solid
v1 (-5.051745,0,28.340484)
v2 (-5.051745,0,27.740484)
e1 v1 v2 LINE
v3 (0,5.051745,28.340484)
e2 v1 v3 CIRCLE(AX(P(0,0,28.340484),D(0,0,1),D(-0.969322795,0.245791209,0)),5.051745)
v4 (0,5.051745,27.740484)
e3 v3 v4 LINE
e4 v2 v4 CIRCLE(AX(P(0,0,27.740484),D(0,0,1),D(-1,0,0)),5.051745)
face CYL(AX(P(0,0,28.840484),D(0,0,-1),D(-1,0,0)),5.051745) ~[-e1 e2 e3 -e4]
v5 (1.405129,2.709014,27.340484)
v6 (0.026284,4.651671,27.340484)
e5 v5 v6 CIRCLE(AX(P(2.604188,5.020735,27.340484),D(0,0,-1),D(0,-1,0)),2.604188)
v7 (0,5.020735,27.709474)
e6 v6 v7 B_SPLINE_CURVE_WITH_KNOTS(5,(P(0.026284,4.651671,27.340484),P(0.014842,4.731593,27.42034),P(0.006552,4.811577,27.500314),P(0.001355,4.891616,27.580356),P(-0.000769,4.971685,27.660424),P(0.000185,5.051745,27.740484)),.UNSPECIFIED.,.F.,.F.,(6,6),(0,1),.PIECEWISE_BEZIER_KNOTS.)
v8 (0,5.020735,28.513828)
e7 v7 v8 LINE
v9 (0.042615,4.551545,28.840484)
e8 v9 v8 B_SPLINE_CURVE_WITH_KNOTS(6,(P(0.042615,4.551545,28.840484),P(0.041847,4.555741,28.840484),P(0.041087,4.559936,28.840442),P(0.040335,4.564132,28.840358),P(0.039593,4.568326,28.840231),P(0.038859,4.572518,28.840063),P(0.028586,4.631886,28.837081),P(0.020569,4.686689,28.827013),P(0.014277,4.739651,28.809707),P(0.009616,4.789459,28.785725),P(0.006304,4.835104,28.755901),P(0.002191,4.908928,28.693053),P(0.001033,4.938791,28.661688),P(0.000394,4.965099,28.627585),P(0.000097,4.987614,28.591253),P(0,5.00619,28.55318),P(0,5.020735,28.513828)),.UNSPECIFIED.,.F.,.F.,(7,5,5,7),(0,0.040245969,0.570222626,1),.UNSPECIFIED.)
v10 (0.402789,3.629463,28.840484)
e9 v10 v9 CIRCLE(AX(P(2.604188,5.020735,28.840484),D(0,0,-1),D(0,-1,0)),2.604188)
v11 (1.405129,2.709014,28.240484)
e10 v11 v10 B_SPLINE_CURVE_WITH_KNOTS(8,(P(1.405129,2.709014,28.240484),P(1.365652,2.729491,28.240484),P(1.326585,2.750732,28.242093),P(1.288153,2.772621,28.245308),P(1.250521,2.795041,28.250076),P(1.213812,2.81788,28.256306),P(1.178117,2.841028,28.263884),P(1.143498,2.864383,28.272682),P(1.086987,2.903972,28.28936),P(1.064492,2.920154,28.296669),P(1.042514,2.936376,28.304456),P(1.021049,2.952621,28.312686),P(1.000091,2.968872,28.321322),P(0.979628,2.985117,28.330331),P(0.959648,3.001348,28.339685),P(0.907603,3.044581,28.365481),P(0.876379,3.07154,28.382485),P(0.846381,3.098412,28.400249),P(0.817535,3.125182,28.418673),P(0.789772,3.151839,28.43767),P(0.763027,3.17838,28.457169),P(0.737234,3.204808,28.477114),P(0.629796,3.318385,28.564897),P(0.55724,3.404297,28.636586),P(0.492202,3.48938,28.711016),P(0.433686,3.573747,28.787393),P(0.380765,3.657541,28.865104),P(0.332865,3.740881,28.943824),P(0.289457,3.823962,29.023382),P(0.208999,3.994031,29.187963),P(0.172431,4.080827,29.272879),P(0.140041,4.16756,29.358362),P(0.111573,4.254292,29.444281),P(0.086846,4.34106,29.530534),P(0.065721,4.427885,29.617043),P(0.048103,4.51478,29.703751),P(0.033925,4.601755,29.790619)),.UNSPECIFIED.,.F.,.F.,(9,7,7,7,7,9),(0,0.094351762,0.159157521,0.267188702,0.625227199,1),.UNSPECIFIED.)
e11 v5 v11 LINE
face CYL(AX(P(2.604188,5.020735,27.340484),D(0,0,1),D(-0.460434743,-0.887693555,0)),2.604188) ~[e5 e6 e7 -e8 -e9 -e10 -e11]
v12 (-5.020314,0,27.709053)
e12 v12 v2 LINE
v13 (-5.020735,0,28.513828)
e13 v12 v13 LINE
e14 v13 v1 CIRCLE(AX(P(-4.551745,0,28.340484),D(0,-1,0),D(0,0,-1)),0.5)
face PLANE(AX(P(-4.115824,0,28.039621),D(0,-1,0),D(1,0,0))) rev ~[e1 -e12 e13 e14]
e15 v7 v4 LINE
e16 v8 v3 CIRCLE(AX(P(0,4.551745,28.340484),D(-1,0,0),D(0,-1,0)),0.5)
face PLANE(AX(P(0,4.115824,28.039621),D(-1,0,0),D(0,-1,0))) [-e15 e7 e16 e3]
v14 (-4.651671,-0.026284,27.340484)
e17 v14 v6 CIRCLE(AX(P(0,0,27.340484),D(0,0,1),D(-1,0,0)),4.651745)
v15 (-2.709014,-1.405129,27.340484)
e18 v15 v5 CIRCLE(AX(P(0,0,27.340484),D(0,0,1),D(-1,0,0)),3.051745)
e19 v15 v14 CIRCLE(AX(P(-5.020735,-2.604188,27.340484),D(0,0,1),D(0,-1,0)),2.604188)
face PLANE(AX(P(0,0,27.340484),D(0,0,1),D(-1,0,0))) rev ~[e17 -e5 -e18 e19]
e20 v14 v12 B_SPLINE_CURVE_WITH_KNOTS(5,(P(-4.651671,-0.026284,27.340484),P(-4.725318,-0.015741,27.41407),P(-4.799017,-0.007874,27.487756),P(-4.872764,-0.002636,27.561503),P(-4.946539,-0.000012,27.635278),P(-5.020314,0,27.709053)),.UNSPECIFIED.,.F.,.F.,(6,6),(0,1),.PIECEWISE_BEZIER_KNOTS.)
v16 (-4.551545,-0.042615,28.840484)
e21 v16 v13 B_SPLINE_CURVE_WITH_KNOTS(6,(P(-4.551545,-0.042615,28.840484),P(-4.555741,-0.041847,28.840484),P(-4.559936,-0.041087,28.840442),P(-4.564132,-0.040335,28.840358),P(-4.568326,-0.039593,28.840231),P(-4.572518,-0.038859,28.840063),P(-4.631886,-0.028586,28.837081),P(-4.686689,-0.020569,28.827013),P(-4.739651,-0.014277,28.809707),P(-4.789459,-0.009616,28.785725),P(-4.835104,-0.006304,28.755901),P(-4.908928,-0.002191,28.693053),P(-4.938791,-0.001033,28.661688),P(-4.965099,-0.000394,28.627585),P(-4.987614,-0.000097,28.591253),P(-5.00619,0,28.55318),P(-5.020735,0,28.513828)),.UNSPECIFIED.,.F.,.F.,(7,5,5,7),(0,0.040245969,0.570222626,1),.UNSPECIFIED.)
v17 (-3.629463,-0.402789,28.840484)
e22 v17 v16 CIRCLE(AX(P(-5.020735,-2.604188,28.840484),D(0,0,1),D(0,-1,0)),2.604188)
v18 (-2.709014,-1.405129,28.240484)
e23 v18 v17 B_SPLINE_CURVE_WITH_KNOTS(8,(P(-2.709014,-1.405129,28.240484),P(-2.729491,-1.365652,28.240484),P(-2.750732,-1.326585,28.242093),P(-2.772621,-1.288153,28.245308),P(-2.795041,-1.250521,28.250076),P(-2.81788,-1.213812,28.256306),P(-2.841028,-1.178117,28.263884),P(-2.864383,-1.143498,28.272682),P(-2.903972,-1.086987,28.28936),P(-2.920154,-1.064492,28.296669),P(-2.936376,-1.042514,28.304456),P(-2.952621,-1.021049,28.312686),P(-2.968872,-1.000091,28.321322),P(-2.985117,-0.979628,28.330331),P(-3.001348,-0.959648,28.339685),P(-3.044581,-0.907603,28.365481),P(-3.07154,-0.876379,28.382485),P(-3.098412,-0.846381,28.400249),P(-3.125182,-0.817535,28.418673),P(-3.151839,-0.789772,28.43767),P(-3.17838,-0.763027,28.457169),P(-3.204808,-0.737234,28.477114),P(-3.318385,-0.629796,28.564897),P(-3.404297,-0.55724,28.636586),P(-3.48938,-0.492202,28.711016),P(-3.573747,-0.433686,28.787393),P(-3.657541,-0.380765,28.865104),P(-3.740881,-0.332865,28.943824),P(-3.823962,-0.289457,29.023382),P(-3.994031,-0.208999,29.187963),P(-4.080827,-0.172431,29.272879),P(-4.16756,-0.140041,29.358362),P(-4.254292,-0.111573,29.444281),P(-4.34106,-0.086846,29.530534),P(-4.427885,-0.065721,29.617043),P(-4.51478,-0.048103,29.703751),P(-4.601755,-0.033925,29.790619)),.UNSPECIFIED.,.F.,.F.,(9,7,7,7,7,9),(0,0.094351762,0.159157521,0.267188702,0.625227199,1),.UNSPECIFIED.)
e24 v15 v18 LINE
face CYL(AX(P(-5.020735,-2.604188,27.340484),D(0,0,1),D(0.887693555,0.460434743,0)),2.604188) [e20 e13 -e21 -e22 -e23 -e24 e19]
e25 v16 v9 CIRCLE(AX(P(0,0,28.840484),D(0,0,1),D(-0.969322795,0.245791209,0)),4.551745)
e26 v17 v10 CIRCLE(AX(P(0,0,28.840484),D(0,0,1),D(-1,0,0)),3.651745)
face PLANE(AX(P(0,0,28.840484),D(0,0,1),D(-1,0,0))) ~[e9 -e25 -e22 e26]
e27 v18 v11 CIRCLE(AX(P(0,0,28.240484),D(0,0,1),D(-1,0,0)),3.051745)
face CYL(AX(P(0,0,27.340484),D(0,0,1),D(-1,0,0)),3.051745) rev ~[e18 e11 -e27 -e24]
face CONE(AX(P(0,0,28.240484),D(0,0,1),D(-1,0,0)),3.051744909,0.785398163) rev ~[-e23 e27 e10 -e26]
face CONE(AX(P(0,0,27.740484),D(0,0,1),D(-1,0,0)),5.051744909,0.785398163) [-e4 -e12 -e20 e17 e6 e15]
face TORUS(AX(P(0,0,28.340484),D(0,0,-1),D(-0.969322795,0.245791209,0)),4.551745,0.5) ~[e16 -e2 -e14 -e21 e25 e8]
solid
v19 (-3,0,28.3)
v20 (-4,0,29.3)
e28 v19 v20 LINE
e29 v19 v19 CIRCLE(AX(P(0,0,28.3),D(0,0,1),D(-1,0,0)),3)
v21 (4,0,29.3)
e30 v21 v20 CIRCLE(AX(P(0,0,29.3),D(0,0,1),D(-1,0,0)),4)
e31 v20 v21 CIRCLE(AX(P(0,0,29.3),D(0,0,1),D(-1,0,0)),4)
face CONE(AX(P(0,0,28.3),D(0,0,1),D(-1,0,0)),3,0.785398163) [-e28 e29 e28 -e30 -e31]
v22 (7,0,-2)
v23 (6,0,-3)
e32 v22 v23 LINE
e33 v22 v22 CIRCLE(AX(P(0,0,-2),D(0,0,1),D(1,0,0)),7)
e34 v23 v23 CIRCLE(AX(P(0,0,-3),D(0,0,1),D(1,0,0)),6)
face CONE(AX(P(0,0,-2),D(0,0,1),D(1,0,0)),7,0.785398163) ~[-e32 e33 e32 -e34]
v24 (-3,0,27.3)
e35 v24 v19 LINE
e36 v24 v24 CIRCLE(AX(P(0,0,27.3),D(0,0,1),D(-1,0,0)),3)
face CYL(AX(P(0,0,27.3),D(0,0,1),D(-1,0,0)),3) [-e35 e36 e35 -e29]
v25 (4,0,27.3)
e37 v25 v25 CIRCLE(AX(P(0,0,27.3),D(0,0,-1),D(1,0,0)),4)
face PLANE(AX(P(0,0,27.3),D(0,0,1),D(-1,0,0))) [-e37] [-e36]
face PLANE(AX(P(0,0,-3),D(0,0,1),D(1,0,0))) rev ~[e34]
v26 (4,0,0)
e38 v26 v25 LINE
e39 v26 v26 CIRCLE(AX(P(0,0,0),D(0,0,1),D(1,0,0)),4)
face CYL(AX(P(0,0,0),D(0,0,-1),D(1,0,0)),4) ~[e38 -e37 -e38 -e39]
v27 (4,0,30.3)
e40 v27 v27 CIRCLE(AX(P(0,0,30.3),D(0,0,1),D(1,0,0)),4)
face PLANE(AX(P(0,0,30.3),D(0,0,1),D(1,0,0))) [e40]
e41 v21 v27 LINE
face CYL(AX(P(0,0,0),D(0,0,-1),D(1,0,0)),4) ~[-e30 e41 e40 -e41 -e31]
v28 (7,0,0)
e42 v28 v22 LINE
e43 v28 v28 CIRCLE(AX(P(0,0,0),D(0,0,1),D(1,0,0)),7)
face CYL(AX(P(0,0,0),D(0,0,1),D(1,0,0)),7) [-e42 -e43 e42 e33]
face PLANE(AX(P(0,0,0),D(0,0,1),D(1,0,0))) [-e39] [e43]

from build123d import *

# Parameters (mm, degrees)
F0_R         = 4
F1_DEPTH     = 30.3
F2_R         = 7
F3_DEPTH     = 3
F6_SIZE      = 1
F8_ANGLE     = 270
F9_R         = 2.6041880276
F10_T2_ANGLE = 298.457193056
F11_SIZE     = 0.4


# Not quite as in the source:
# - a fillet or chamfer that OpenCascade refuses, or shapes differently, is made with other operations: its cross-section is extruded or revolved along the edge and cut away or added


with BuildPart() as f1:
    # F0 (on Top) → F1 (new body)
    with BuildSketch(Plane.XY):
        Circle(F0_R)
    extrude(amount=F1_DEPTH)

    # F2 (on Top) → F3 (join)
    with BuildSketch(Plane.XY):
        Circle(F2_R)
    extrude(amount=-F3_DEPTH)

    # F4 (on Front) → F5 (revolve, cut)
    with BuildSketch(Plane.XZ):
        Polygon((-4, 29.3), (-4.1, 29.3), (-4.1, 27.3), (-3, 27.3), (-3, 28.3), align=None)
    revolve(axis=Axis((0, 0, 30.3), (0, 0, 1)), mode=Mode.SUBTRACT)

    # F6
    f6_edges = [f1.edges().sort_by_distance(p)[0] for p in [
        (-7, 0, -3),
    ]]
    chamfer(f6_edges, length=F6_SIZE)


with BuildPart() as f8:
    # F7 (on Front) → F8 (revolve)
    with BuildSketch(Plane.XZ):
        Polygon((-5.0517449093, 28.8404841072), (-5.0517449093, 27.3404841072), (-3.0517449093, 27.3404841072), (-3.0517449093, 28.2404841072), (-3.6517449093, 28.8404841072), align=None)
    revolve(axis=Axis((0, 0, 30.3), (0, 0, 1)), revolution_arc=F8_ANGLE)

    # F9
    f9_edges = [f8.edges().sort_by_distance(p)[0] for p in [
        (0, 3.051745, 27.790484),
        (-3.051745, 0, 27.790484),
    ]]
    fillet(f9_edges, radius=F9_R)

    # F10: fillet of radius 0.5 on 1 edges, made by hand

    # F10_s1 → F10_t2 (revolve, cut)
    with BuildSketch(Plane(origin=(0, 0, 0), x_dir=(0, 0, 1), z_dir=(0.2457912089, 0.9693227954, 0))):
        with BuildLine():
            ThreePointArc((28.8404841072, -4.5517449093), (28.6940374978, -4.9052982999), (28.3404841072, -5.0517449093))
            Line((28.3404841072, -5.0517449093), (28.8404841072, -5.0517449093))
            Line((28.8404841072, -5.0517449093), (28.8404841072, -4.5517449093))
        make_face()
    revolve(axis=Axis((0, 0, 28.8404841072), (0, 0, 1)), revolution_arc=F10_T2_ANGLE, mode=Mode.SUBTRACT)

    # F11
    f11_edges = [f8.edges().sort_by_distance(p)[0] for p in [
        (3.572123, -3.572123, 27.340484),
    ]]
    chamfer(f11_edges, length=F11_SIZE)


solid = Compound([f1.part, f8.part])
